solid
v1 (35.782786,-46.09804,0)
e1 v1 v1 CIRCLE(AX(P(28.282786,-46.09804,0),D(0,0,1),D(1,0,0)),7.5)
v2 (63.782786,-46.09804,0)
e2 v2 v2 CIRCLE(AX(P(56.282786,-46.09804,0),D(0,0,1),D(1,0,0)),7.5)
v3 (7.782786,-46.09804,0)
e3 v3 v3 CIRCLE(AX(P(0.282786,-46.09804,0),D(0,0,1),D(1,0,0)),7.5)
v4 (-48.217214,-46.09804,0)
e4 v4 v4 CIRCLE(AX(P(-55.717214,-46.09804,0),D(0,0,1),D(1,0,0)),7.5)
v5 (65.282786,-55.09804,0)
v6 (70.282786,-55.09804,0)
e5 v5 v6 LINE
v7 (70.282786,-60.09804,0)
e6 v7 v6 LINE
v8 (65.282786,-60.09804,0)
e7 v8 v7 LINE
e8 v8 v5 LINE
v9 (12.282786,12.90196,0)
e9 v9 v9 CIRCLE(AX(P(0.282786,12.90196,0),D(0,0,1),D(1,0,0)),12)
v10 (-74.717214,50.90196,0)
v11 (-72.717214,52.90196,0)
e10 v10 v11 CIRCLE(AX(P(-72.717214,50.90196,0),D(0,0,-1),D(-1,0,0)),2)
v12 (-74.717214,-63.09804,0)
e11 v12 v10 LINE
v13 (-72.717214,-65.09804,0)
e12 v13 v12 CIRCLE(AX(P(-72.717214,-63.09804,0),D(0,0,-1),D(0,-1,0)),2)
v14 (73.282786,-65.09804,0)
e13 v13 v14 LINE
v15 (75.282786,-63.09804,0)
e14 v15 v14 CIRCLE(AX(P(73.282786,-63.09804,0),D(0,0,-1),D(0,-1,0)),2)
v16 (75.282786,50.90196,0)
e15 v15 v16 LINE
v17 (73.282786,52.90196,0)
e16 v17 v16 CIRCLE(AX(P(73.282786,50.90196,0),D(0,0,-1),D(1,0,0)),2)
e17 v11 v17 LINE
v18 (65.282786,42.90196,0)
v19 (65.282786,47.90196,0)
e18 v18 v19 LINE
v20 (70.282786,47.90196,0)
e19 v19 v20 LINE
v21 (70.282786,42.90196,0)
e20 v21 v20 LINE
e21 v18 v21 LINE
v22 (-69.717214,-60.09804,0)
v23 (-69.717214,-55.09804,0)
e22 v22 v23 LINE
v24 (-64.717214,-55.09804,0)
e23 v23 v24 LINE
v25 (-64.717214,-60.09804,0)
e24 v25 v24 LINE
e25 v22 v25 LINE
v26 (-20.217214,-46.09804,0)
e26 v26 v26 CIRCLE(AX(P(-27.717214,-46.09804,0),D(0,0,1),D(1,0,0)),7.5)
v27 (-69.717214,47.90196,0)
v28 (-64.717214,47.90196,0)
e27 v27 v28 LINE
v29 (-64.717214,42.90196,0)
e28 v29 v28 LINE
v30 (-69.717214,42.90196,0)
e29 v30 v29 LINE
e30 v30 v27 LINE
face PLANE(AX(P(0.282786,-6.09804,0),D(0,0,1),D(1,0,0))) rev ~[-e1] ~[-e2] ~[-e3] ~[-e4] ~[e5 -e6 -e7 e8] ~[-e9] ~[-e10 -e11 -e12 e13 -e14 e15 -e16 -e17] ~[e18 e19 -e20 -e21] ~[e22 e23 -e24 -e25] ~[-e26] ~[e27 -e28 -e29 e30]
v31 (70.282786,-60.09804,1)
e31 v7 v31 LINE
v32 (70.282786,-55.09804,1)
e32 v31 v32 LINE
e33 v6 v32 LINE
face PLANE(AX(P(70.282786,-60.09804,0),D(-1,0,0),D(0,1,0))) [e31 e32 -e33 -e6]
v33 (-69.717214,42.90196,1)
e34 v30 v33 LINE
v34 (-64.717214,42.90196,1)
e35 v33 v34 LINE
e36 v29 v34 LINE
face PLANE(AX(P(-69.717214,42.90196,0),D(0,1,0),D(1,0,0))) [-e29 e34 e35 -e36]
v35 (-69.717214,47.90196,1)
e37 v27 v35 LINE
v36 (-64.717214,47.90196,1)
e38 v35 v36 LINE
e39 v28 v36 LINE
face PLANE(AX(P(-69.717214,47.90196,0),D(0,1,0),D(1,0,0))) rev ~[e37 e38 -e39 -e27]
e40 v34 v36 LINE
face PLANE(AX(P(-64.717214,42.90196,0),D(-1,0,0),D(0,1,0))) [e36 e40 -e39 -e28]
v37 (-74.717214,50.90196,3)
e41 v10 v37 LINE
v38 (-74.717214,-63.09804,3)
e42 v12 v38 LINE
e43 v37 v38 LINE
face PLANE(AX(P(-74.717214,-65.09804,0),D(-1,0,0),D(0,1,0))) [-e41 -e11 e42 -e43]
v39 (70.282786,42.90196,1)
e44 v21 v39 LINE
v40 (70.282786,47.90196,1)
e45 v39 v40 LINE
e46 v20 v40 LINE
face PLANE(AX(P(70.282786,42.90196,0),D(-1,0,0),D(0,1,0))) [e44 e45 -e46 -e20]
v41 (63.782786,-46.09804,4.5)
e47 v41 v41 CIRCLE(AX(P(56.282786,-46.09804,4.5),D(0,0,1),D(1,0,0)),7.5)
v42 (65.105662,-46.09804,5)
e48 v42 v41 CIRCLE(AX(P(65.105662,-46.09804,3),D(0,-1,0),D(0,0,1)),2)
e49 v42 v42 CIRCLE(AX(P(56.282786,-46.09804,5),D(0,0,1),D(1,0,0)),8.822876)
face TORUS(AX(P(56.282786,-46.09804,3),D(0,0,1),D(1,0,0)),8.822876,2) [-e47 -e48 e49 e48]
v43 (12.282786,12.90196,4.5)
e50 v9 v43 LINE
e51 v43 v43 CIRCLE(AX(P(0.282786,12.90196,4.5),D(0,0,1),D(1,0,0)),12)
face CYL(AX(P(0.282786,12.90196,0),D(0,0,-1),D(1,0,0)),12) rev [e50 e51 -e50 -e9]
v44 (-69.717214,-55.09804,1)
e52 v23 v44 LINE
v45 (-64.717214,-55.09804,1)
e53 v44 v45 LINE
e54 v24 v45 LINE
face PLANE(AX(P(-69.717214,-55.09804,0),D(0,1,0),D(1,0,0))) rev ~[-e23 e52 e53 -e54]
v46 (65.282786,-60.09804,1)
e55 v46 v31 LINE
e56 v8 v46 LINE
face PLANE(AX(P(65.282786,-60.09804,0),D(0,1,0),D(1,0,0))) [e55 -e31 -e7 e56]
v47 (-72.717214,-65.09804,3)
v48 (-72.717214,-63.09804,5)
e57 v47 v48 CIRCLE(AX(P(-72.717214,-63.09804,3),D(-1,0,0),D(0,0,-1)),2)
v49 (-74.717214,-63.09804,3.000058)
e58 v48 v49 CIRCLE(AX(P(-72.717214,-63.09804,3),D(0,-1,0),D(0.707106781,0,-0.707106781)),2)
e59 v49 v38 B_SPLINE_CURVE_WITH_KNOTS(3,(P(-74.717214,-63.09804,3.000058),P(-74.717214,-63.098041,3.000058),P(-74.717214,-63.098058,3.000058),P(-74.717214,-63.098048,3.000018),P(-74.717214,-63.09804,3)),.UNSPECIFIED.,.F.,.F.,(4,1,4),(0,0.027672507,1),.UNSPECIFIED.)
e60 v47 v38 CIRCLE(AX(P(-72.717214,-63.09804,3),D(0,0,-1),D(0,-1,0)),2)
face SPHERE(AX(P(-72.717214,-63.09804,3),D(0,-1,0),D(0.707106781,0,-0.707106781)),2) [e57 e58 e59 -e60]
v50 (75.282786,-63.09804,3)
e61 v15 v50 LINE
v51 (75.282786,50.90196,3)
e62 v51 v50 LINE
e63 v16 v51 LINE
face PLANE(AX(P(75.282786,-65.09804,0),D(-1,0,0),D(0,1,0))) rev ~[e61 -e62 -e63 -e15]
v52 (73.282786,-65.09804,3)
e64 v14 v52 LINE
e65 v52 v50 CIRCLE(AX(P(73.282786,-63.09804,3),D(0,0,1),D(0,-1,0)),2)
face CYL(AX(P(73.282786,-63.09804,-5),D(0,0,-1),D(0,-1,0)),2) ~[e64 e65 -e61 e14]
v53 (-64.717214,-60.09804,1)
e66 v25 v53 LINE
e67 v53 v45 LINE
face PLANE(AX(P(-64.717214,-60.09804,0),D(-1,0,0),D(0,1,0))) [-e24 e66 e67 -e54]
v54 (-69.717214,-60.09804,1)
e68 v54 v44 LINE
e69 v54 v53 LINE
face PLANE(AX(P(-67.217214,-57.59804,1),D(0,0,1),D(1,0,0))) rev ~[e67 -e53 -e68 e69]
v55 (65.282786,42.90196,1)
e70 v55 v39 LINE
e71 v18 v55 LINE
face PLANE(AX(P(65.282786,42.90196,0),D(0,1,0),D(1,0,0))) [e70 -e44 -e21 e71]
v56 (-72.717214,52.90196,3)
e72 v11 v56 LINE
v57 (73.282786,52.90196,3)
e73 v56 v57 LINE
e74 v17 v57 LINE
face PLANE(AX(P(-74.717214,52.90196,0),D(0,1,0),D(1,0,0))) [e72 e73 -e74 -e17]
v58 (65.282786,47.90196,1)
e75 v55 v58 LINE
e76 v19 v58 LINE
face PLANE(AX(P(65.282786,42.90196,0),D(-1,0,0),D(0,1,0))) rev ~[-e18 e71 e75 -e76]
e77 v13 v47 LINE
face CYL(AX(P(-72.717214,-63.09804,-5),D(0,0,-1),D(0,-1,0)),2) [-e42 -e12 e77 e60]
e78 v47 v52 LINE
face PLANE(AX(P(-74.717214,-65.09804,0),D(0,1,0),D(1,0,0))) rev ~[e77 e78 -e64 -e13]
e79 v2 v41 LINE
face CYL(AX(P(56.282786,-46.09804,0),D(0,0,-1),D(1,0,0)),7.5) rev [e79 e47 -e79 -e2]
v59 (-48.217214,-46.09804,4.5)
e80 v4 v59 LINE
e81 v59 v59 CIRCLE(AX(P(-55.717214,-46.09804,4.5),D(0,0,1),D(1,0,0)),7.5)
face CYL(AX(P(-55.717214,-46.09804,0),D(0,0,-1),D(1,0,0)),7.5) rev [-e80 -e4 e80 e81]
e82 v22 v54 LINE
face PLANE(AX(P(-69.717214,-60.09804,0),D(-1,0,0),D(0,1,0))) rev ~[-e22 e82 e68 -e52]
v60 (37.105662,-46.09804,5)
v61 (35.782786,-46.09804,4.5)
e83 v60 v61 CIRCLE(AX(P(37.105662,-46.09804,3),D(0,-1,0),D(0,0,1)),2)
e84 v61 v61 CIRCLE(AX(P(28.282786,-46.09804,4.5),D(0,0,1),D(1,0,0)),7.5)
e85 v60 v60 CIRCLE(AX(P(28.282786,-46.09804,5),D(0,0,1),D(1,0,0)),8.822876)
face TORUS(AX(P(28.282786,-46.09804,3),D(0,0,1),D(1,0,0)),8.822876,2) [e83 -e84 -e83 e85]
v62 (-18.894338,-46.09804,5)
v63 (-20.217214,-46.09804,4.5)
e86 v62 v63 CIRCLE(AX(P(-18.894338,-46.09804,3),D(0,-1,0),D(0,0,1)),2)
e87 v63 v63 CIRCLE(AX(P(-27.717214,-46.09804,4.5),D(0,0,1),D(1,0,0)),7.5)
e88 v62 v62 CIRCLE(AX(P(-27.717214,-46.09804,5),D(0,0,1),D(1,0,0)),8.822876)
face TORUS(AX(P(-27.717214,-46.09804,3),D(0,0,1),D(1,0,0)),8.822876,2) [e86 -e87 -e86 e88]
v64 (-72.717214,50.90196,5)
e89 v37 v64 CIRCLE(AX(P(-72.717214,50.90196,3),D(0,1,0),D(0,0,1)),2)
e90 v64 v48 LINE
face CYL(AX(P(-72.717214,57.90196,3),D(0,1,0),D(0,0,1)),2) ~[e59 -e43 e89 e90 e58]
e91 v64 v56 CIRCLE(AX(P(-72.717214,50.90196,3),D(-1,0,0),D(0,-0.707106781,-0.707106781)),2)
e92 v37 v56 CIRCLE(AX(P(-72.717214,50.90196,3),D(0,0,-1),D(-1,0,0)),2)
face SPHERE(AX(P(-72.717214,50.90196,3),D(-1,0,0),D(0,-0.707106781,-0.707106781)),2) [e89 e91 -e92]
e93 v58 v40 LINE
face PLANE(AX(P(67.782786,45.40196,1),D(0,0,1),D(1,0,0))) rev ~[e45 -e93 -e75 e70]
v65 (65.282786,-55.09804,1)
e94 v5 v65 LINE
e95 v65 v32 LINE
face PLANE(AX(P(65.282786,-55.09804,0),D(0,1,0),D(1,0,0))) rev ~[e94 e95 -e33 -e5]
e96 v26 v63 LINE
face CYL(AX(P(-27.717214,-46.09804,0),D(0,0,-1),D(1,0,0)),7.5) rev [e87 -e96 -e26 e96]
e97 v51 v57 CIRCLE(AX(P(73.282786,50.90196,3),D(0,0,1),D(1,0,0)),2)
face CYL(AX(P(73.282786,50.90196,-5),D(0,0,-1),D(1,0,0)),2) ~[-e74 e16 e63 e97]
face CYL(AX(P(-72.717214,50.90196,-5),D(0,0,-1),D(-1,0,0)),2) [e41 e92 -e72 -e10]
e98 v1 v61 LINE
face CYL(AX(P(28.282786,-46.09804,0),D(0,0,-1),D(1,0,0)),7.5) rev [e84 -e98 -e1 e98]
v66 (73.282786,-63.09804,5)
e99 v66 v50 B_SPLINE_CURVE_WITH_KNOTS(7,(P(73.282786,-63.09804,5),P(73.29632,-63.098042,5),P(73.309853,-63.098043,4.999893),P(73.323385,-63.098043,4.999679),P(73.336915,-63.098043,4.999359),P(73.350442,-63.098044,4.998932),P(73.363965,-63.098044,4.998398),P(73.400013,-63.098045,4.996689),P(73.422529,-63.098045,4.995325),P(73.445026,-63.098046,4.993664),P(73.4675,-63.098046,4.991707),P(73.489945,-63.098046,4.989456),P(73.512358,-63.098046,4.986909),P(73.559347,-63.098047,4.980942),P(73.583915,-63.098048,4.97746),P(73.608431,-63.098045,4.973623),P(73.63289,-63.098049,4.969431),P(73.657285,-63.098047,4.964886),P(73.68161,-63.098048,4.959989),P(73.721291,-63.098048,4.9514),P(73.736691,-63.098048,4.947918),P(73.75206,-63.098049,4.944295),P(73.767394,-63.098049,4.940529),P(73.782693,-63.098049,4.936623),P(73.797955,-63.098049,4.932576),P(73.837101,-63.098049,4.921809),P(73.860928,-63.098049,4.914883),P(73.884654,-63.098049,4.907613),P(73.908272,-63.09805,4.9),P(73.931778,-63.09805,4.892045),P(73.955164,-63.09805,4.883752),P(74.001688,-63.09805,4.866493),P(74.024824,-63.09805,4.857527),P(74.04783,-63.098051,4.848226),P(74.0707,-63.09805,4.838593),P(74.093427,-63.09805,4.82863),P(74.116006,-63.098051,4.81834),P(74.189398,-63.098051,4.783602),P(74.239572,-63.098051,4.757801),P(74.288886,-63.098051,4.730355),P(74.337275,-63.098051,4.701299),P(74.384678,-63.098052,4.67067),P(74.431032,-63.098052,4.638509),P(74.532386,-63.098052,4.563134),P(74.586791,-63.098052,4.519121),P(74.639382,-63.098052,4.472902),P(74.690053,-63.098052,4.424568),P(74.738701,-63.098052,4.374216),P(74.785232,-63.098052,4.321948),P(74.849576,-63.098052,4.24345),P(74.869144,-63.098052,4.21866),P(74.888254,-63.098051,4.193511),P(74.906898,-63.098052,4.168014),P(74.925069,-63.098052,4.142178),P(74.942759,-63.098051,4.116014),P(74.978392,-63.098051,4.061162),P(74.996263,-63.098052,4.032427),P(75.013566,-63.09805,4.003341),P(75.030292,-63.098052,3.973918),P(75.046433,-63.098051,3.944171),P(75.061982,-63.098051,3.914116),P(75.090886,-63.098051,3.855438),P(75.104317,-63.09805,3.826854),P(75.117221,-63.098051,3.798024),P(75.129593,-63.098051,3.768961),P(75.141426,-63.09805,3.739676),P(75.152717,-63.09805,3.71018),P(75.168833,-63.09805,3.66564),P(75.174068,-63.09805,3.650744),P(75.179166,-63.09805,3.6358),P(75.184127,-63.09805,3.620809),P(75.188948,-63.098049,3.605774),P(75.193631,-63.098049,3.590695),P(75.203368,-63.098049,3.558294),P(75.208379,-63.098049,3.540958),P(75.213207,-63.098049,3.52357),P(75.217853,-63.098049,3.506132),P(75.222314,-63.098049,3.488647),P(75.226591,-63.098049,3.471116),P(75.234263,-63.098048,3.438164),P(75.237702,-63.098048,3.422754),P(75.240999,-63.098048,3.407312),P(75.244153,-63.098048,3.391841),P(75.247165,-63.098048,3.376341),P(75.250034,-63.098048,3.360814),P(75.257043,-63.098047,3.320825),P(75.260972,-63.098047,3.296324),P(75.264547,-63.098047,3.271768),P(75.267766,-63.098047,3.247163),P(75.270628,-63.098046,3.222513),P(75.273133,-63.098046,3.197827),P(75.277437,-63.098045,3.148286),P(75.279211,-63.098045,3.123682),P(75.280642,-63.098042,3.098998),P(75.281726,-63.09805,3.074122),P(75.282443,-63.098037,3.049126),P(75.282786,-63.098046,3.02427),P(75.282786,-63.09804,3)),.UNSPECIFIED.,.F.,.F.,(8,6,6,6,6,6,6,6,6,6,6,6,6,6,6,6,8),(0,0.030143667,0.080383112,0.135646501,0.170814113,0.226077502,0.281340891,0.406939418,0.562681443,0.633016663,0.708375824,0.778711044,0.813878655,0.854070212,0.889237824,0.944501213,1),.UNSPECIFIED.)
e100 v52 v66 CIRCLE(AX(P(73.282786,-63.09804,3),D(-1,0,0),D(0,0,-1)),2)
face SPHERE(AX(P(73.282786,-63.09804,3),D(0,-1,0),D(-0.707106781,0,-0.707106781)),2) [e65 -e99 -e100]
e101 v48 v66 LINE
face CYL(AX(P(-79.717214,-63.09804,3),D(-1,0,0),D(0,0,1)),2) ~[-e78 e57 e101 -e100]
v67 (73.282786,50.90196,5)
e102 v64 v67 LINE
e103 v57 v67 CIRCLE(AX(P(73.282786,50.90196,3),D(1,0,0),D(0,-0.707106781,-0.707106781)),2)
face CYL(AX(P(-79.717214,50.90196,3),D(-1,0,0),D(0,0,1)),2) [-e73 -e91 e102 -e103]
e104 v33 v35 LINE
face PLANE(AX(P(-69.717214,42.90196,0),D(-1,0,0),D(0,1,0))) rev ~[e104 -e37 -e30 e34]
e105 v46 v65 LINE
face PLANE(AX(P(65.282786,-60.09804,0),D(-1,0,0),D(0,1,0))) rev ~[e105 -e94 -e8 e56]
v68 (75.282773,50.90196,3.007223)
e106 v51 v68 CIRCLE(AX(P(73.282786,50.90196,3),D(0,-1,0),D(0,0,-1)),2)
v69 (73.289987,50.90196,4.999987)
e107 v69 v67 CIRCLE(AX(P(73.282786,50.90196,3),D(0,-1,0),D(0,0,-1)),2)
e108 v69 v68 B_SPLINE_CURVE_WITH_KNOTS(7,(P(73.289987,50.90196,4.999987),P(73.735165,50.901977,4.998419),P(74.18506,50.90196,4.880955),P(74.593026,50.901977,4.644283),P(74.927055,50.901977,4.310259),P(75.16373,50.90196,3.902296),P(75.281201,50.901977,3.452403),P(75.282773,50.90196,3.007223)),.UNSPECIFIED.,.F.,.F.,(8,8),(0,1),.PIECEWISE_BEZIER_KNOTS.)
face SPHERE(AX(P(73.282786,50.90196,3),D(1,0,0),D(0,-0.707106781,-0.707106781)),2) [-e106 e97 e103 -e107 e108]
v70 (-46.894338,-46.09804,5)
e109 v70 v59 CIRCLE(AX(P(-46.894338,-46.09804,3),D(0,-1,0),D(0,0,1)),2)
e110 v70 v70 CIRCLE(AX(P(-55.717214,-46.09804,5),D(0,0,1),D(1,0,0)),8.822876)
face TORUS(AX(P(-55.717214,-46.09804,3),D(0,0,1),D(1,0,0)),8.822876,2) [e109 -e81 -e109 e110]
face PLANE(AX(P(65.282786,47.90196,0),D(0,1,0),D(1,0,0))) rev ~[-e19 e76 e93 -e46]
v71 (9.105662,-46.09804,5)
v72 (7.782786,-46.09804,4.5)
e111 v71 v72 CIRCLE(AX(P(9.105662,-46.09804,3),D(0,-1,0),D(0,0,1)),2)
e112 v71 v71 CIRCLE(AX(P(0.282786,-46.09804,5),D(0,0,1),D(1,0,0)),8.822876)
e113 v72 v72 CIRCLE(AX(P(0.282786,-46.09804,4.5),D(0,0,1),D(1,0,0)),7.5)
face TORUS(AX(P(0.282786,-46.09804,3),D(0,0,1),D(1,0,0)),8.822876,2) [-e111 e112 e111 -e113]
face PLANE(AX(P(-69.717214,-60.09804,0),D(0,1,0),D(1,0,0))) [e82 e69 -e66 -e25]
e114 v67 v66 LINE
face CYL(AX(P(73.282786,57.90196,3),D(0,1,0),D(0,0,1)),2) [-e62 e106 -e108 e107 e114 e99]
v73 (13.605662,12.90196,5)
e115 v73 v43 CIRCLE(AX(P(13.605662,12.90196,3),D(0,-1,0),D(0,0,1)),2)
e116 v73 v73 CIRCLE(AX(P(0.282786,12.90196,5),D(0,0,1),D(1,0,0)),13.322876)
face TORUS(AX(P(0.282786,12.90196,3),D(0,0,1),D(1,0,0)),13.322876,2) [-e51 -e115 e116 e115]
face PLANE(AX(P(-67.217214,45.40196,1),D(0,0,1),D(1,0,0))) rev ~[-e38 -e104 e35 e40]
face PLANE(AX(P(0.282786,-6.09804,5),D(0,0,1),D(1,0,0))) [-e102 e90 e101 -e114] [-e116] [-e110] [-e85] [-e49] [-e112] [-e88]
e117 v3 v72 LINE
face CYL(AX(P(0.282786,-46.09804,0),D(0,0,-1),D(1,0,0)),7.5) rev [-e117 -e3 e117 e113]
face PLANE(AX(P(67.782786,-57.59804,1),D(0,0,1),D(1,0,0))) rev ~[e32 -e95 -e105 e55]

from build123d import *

# Parameters (mm, degrees)
F0_W         = 150
F0_H         = 118
F0_W_2       = 5
F0_H_2       = 5
F0_R         = 7.5
F0_R_2       = 12
F1_DEPTH     = 5
F2_DEPTH     = 1
F3_SIZE      = 0.5
F4_T1_DEPTH  = 160
F4_T3_DEPTH  = 128
F5_T1_DEPTH  = 8
F5_S5_W      = 2
F5_S5_H      = 2
F5_T6_DEPTH  = 2
F5_S11_W     = 2
F5_S11_H     = 2
F5_T12_DEPTH = 2
F5_S17_W     = 2
F5_S17_H     = 2
F5_T18_DEPTH = 2
F5_S23_W     = 2
F5_S23_H     = 2
F5_T24_DEPTH = 2


# Not quite as in the source:
# - a fillet or chamfer that OpenCascade refuses, or shapes differently, is made with other operations: its cross-section is extruded or revolved along the edge and cut away or added


with BuildPart() as f1:
    # F0 (on Top) → F1 (new body)
    with BuildSketch(Plane.XY):
        with Locations((0.2827864019, -6.098040469)):
            Rectangle(F0_W, F0_H)
        with Locations((-67.2172135981, -57.598040469)):
            Rectangle(F0_W_2, F0_H_2, mode=Mode.SUBTRACT)
        with Locations((-55.7172135981, -46.098040469)):
            Circle(F0_R, mode=Mode.SUBTRACT)
        with Locations((-27.7172135981, -46.098040469)):
            Circle(F0_R, mode=Mode.SUBTRACT)
        with Locations((0.2827864019, -46.098040469)):
            Circle(F0_R, mode=Mode.SUBTRACT)
        with Locations((28.2827864019, -46.098040469)):
            Circle(F0_R, mode=Mode.SUBTRACT)
        with Locations((67.7827864019, -57.598040469)):
            Rectangle(F0_W_2, F0_H_2, mode=Mode.SUBTRACT)
        with Locations((56.2827864019, -46.098040469)):
            Circle(F0_R, mode=Mode.SUBTRACT)
        with Locations((-67.2172135981, 45.401959531)):
            Rectangle(F0_W_2, F0_H_2, mode=Mode.SUBTRACT)
        with Locations((0.2827864019, 12.901959531)):
            Circle(F0_R_2, mode=Mode.SUBTRACT)
        with Locations((67.7827864019, 45.401959531)):
            Rectangle(F0_W_2, F0_H_2, mode=Mode.SUBTRACT)
        with Locations((-67.2172135981, -57.598040469)):
            Rectangle(F0_W_2, F0_H_2)
        with Locations((-67.2172135981, 45.401959531)):
            Rectangle(F0_W_2, F0_H_2)
        with Locations((67.7827864019, 45.401959531)):
            Rectangle(F0_W_2, F0_H_2)
        with Locations((67.7827864019, -57.598040469)):
            Rectangle(F0_W_2, F0_H_2)
    extrude(amount=F1_DEPTH)

    # F0 (on Top) → F2 (cut)
    with BuildSketch(Plane.XY):
        with Locations((-67.2172135981, 45.401959531)):
            Rectangle(F0_W_2, F0_H_2)
        with Locations((67.7827864019, 45.401959531)):
            Rectangle(F0_W_2, F0_H_2)
        with Locations((67.7827864019, -57.598040469)):
            Rectangle(F0_W_2, F0_H_2)
        with Locations((-67.2172135981, -57.598040469)):
            Rectangle(F0_W_2, F0_H_2)
    extrude(amount=F2_DEPTH, mode=Mode.SUBTRACT)

    # F3
    f3_edges = [f1.edges().sort_by_distance(p)[0] for p in [
        (-11.717214, 12.90196, 5),
        (-63.217214, -46.09804, 5),
        (-35.217214, -46.09804, 5),
        (-7.217214, -46.09804, 5),
        (20.782786, -46.09804, 5),
        (48.782786, -46.09804, 5),
    ]]
    chamfer(f3_edges, length=F3_SIZE)

    # F4: fillet of radius 2 on 10 edges, made by hand

    # F4_s2 → F4_t1 (cut)
    with BuildSketch(Plane.YZ.offset(-79.7172135981)):
        with BuildLine():
            ThreePointArc((50.901959531, 5), (52.3161730933, 4.4142135624), (52.901959531, 3))
            Line((52.901959531, 3), (52.901959531, 5))
            Line((52.901959531, 5), (50.901959531, 5))
        make_face()
        with BuildLine():
            ThreePointArc((-63.098040469, 5), (-64.5122540314, 4.4142135624), (-65.098040469, 3))
            Line((-65.098040469, 3), (-65.098040469, 5))
            Line((-65.098040469, 5), (-63.098040469, 5))
        make_face()
    extrude(amount=F4_T1_DEPTH, mode=Mode.SUBTRACT)

    # F4_s4 → F4_t3 (cut)
    with BuildSketch(Plane.XZ.offset(-57.901959531)):
        with BuildLine():
            ThreePointArc((-72.7172135981, 5), (-74.1314271605, 4.4142135624), (-74.7172135981, 3))
            Line((-74.7172135981, 3), (-74.7172135981, 5))
            Line((-74.7172135981, 5), (-72.7172135981, 5))
        make_face()
        with BuildLine():
            ThreePointArc((73.2827864019, 5), (74.6969999642, 4.4142135624), (75.2827864019, 3))
            Line((75.2827864019, 3), (75.2827864019, 5))
            Line((75.2827864019, 5), (73.2827864019, 5))
        make_face()
    extrude(amount=F4_T3_DEPTH, mode=Mode.SUBTRACT)

    # F4_s5 → F4_t6 (revolve, cut)
    with BuildSketch(Plane.XZ.offset(-12.901959531)):
        with BuildLine():
            ThreePointArc((13.6056620574, 5), (12.8985552762, 4.8708286934), (12.2827864019, 4.5))
            Line((12.2827864019, 4.5), (12.7827864019, 5))
            Line((12.7827864019, 5), (13.6056620574, 5))
        make_face()
    revolve(axis=Axis((0.2827864019, 12.901959531, 5), (0, 0, 1)), mode=Mode.SUBTRACT)

    # F4_s7 → F4_t8 (revolve, cut)
    with BuildSketch(Plane.XZ.offset(46.098040469)):
        with BuildLine():
            ThreePointArc((-46.8943379426, 5), (-47.6014447238, 4.8708286934), (-48.2172135981, 4.5))
            Line((-48.2172135981, 4.5), (-47.7172135981, 5))
            Line((-47.7172135981, 5), (-46.8943379426, 5))
        make_face()
    revolve(axis=Axis((-55.7172135981, -46.098040469, 5), (0, 0, 1)), mode=Mode.SUBTRACT)

    # F4_s9 → F4_t10 (revolve, cut)
    with BuildSketch(Plane.XZ.offset(46.098040469)):
        with BuildLine():
            ThreePointArc((-18.8943379426, 5), (-19.6014447238, 4.8708286934), (-20.2172135981, 4.5))
            Line((-20.2172135981, 4.5), (-19.7172135981, 5))
            Line((-19.7172135981, 5), (-18.8943379426, 5))
        make_face()
    revolve(axis=Axis((-27.7172135981, -46.098040469, 5), (0, 0, 1)), mode=Mode.SUBTRACT)

    # F4_s11 → F4_t12 (revolve, cut)
    with BuildSketch(Plane.XZ.offset(46.098040469)):
        with BuildLine():
            ThreePointArc((9.1056620574, 5), (8.3985552762, 4.8708286934), (7.7827864019, 4.5))
            Line((7.7827864019, 4.5), (8.2827864019, 5))
            Line((8.2827864019, 5), (9.1056620574, 5))
        make_face()
    revolve(axis=Axis((0.2827864019, -46.098040469, 5), (0, 0, 1)), mode=Mode.SUBTRACT)

    # F4_s13 → F4_t14 (revolve, cut)
    with BuildSketch(Plane.XZ.offset(46.098040469)):
        with BuildLine():
            ThreePointArc((37.1056620574, 5), (36.3985552762, 4.8708286934), (35.7827864019, 4.5))
            Line((35.7827864019, 4.5), (36.2827864019, 5))
            Line((36.2827864019, 5), (37.1056620574, 5))
        make_face()
    revolve(axis=Axis((28.2827864019, -46.098040469, 5), (0, 0, 1)), mode=Mode.SUBTRACT)

    # F4_s15 → F4_t16 (revolve, cut)
    with BuildSketch(Plane.XZ.offset(46.098040469)):
        with BuildLine():
            ThreePointArc((65.1056620574, 5), (64.3985552762, 4.8708286934), (63.7827864019, 4.5))
            Line((63.7827864019, 4.5), (64.2827864019, 5))
            Line((64.2827864019, 5), (65.1056620574, 5))
        make_face()
    revolve(axis=Axis((56.2827864019, -46.098040469, 5), (0, 0, 1)), mode=Mode.SUBTRACT)

    # F5: fillet of radius 2 on 14 edges, made by hand

    # F5_s2 → F5_t1 (cut)
    with BuildSketch(Plane.XY.offset(-5)):
        with BuildLine():
            ThreePointArc((73.2827864019, -65.098040469), (74.6969999642, -64.5122540314), (75.2827864019, -63.098040469))
            Line((75.2827864019, -63.098040469), (75.2827864019, -65.098040469))
            Line((75.2827864019, -65.098040469), (73.2827864019, -65.098040469))
        make_face()
        with BuildLine():
            ThreePointArc((-72.7172135981, -65.098040469), (-74.1314271605, -64.5122540314), (-74.7172135981, -63.098040469))
            Line((-74.7172135981, -63.098040469), (-74.7172135981, -65.098040469))
            Line((-74.7172135981, -65.098040469), (-72.7172135981, -65.098040469))
        make_face()
        with BuildLine():
            ThreePointArc((-74.7172135981, 50.901959531), (-74.1314271605, 52.3161730933), (-72.7172135981, 52.901959531))
            Line((-72.7172135981, 52.901959531), (-74.7172135981, 52.901959531))
            Line((-74.7172135981, 52.901959531), (-74.7172135981, 50.901959531))
        make_face()
        with BuildLine():
            ThreePointArc((75.2827864019, 50.901959531), (74.6969999642, 52.3161730933), (73.2827864019, 52.901959531))
            Line((73.2827864019, 52.901959531), (75.2827864019, 52.901959531))
            Line((75.2827864019, 52.901959531), (75.2827864019, 50.901959531))
        make_face()
    extrude(amount=F5_T1_DEPTH, mode=Mode.SUBTRACT)


with BuildPart() as f5_tool4:
    # F5_s5 → F5_t6 (new body)
    with BuildSketch(Plane.YZ.offset(73.2827864019)):
        with Locations((51.901959531, 4)):
            Rectangle(F5_S5_W, F5_S5_H)
    extrude(amount=F5_T6_DEPTH)

    # F5_s7 → F5_t8 (revolve, cut)
    with BuildSketch(Plane(origin=(73.2827864019, 50.901959531, 3), x_dir=(0, -0.7071067812, -0.7071067812), z_dir=(0, -0.7071067812, 0.7071067812))):
        with BuildLine():
            ThreePointArc((0, -2), (2, 0), (0, 2))
            Line((0, 2), (0, -2))
        make_face()
    revolve(axis=Axis((73.2827864019, 50.901959531, 3), (1, 0, 0)), mode=Mode.SUBTRACT)


with BuildPart() as f1_1:
    add(f1.part)

    # F5_t3: cut F5_tool4
    add(f5_tool4.part, mode=Mode.SUBTRACT)


with BuildPart() as f5_tool10:
    # F5_s11 → F5_t12 (new body)
    with BuildSketch(Plane.XZ.offset(63.098040469)):
        with Locations((74.2827864019, 4)):
            Rectangle(F5_S11_W, F5_S11_H)
    extrude(amount=F5_T12_DEPTH)

    # F5_s13 → F5_t14 (revolve, cut)
    with BuildSketch(Plane(origin=(73.2827864019, -63.098040469, 3), x_dir=(-0.7071067812, 0, -0.7071067812), z_dir=(-0.7071067812, 0, 0.7071067812))):
        with BuildLine():
            ThreePointArc((0, -2), (2, 0), (0, 2))
            Line((0, 2), (0, -2))
        make_face()
    revolve(axis=Axis((73.2827864019, -63.098040469, 3), (0, -1, 0)), mode=Mode.SUBTRACT)


with BuildPart() as f1_2:
    add(f1_1.part)

    # F5_t9: cut F5_tool10
    add(f5_tool10.part, mode=Mode.SUBTRACT)


with BuildPart() as f5_tool16:
    # F5_s17 → F5_t18 (new body)
    with BuildSketch(Plane.XZ.offset(63.098040469)):
        with Locations((-73.7172135981, 4)):
            Rectangle(F5_S17_W, F5_S17_H)
    extrude(amount=F5_T18_DEPTH)

    # F5_s19 → F5_t20 (revolve, cut)
    with BuildSketch(Plane(origin=(-72.7172135981, -63.098040469, 3), x_dir=(0.7071067812, 0, -0.7071067812), z_dir=(-0.7071067812, 0, -0.7071067812))):
        with BuildLine():
            ThreePointArc((0, -2), (2, 0), (0, 2))
            Line((0, 2), (0, -2))
        make_face()
    revolve(axis=Axis((-72.7172135981, -63.098040469, 3), (0, -1, 0)), mode=Mode.SUBTRACT)


with BuildPart() as f1_3:
    add(f1_2.part)

    # F5_t15: cut F5_tool16
    add(f5_tool16.part, mode=Mode.SUBTRACT)


with BuildPart() as f5_tool22:
    # F5_s23 → F5_t24 (new body)
    with BuildSketch(Plane.YZ.offset(-72.7172135981)):
        with Locations((51.901959531, 4)):
            Rectangle(F5_S23_W, F5_S23_H)
    extrude(amount=-F5_T24_DEPTH)

    # F5_s25 → F5_t26 (revolve, cut)
    with BuildSketch(Plane(origin=(-72.7172135981, 50.901959531, 3), x_dir=(0, -0.7071067812, -0.7071067812), z_dir=(0, 0.7071067812, -0.7071067812))):
        with BuildLine():
            ThreePointArc((0, -2), (2, 0), (0, 2))
            Line((0, 2), (0, -2))
        make_face()
    revolve(axis=Axis((-72.7172135981, 50.901959531, 3), (-1, 0, 0)), mode=Mode.SUBTRACT)


with BuildPart() as f1_4:
    add(f1_3.part)

    # F5_t21: cut F5_tool22
    add(f5_tool22.part, mode=Mode.SUBTRACT)


solid = f1_4.part
